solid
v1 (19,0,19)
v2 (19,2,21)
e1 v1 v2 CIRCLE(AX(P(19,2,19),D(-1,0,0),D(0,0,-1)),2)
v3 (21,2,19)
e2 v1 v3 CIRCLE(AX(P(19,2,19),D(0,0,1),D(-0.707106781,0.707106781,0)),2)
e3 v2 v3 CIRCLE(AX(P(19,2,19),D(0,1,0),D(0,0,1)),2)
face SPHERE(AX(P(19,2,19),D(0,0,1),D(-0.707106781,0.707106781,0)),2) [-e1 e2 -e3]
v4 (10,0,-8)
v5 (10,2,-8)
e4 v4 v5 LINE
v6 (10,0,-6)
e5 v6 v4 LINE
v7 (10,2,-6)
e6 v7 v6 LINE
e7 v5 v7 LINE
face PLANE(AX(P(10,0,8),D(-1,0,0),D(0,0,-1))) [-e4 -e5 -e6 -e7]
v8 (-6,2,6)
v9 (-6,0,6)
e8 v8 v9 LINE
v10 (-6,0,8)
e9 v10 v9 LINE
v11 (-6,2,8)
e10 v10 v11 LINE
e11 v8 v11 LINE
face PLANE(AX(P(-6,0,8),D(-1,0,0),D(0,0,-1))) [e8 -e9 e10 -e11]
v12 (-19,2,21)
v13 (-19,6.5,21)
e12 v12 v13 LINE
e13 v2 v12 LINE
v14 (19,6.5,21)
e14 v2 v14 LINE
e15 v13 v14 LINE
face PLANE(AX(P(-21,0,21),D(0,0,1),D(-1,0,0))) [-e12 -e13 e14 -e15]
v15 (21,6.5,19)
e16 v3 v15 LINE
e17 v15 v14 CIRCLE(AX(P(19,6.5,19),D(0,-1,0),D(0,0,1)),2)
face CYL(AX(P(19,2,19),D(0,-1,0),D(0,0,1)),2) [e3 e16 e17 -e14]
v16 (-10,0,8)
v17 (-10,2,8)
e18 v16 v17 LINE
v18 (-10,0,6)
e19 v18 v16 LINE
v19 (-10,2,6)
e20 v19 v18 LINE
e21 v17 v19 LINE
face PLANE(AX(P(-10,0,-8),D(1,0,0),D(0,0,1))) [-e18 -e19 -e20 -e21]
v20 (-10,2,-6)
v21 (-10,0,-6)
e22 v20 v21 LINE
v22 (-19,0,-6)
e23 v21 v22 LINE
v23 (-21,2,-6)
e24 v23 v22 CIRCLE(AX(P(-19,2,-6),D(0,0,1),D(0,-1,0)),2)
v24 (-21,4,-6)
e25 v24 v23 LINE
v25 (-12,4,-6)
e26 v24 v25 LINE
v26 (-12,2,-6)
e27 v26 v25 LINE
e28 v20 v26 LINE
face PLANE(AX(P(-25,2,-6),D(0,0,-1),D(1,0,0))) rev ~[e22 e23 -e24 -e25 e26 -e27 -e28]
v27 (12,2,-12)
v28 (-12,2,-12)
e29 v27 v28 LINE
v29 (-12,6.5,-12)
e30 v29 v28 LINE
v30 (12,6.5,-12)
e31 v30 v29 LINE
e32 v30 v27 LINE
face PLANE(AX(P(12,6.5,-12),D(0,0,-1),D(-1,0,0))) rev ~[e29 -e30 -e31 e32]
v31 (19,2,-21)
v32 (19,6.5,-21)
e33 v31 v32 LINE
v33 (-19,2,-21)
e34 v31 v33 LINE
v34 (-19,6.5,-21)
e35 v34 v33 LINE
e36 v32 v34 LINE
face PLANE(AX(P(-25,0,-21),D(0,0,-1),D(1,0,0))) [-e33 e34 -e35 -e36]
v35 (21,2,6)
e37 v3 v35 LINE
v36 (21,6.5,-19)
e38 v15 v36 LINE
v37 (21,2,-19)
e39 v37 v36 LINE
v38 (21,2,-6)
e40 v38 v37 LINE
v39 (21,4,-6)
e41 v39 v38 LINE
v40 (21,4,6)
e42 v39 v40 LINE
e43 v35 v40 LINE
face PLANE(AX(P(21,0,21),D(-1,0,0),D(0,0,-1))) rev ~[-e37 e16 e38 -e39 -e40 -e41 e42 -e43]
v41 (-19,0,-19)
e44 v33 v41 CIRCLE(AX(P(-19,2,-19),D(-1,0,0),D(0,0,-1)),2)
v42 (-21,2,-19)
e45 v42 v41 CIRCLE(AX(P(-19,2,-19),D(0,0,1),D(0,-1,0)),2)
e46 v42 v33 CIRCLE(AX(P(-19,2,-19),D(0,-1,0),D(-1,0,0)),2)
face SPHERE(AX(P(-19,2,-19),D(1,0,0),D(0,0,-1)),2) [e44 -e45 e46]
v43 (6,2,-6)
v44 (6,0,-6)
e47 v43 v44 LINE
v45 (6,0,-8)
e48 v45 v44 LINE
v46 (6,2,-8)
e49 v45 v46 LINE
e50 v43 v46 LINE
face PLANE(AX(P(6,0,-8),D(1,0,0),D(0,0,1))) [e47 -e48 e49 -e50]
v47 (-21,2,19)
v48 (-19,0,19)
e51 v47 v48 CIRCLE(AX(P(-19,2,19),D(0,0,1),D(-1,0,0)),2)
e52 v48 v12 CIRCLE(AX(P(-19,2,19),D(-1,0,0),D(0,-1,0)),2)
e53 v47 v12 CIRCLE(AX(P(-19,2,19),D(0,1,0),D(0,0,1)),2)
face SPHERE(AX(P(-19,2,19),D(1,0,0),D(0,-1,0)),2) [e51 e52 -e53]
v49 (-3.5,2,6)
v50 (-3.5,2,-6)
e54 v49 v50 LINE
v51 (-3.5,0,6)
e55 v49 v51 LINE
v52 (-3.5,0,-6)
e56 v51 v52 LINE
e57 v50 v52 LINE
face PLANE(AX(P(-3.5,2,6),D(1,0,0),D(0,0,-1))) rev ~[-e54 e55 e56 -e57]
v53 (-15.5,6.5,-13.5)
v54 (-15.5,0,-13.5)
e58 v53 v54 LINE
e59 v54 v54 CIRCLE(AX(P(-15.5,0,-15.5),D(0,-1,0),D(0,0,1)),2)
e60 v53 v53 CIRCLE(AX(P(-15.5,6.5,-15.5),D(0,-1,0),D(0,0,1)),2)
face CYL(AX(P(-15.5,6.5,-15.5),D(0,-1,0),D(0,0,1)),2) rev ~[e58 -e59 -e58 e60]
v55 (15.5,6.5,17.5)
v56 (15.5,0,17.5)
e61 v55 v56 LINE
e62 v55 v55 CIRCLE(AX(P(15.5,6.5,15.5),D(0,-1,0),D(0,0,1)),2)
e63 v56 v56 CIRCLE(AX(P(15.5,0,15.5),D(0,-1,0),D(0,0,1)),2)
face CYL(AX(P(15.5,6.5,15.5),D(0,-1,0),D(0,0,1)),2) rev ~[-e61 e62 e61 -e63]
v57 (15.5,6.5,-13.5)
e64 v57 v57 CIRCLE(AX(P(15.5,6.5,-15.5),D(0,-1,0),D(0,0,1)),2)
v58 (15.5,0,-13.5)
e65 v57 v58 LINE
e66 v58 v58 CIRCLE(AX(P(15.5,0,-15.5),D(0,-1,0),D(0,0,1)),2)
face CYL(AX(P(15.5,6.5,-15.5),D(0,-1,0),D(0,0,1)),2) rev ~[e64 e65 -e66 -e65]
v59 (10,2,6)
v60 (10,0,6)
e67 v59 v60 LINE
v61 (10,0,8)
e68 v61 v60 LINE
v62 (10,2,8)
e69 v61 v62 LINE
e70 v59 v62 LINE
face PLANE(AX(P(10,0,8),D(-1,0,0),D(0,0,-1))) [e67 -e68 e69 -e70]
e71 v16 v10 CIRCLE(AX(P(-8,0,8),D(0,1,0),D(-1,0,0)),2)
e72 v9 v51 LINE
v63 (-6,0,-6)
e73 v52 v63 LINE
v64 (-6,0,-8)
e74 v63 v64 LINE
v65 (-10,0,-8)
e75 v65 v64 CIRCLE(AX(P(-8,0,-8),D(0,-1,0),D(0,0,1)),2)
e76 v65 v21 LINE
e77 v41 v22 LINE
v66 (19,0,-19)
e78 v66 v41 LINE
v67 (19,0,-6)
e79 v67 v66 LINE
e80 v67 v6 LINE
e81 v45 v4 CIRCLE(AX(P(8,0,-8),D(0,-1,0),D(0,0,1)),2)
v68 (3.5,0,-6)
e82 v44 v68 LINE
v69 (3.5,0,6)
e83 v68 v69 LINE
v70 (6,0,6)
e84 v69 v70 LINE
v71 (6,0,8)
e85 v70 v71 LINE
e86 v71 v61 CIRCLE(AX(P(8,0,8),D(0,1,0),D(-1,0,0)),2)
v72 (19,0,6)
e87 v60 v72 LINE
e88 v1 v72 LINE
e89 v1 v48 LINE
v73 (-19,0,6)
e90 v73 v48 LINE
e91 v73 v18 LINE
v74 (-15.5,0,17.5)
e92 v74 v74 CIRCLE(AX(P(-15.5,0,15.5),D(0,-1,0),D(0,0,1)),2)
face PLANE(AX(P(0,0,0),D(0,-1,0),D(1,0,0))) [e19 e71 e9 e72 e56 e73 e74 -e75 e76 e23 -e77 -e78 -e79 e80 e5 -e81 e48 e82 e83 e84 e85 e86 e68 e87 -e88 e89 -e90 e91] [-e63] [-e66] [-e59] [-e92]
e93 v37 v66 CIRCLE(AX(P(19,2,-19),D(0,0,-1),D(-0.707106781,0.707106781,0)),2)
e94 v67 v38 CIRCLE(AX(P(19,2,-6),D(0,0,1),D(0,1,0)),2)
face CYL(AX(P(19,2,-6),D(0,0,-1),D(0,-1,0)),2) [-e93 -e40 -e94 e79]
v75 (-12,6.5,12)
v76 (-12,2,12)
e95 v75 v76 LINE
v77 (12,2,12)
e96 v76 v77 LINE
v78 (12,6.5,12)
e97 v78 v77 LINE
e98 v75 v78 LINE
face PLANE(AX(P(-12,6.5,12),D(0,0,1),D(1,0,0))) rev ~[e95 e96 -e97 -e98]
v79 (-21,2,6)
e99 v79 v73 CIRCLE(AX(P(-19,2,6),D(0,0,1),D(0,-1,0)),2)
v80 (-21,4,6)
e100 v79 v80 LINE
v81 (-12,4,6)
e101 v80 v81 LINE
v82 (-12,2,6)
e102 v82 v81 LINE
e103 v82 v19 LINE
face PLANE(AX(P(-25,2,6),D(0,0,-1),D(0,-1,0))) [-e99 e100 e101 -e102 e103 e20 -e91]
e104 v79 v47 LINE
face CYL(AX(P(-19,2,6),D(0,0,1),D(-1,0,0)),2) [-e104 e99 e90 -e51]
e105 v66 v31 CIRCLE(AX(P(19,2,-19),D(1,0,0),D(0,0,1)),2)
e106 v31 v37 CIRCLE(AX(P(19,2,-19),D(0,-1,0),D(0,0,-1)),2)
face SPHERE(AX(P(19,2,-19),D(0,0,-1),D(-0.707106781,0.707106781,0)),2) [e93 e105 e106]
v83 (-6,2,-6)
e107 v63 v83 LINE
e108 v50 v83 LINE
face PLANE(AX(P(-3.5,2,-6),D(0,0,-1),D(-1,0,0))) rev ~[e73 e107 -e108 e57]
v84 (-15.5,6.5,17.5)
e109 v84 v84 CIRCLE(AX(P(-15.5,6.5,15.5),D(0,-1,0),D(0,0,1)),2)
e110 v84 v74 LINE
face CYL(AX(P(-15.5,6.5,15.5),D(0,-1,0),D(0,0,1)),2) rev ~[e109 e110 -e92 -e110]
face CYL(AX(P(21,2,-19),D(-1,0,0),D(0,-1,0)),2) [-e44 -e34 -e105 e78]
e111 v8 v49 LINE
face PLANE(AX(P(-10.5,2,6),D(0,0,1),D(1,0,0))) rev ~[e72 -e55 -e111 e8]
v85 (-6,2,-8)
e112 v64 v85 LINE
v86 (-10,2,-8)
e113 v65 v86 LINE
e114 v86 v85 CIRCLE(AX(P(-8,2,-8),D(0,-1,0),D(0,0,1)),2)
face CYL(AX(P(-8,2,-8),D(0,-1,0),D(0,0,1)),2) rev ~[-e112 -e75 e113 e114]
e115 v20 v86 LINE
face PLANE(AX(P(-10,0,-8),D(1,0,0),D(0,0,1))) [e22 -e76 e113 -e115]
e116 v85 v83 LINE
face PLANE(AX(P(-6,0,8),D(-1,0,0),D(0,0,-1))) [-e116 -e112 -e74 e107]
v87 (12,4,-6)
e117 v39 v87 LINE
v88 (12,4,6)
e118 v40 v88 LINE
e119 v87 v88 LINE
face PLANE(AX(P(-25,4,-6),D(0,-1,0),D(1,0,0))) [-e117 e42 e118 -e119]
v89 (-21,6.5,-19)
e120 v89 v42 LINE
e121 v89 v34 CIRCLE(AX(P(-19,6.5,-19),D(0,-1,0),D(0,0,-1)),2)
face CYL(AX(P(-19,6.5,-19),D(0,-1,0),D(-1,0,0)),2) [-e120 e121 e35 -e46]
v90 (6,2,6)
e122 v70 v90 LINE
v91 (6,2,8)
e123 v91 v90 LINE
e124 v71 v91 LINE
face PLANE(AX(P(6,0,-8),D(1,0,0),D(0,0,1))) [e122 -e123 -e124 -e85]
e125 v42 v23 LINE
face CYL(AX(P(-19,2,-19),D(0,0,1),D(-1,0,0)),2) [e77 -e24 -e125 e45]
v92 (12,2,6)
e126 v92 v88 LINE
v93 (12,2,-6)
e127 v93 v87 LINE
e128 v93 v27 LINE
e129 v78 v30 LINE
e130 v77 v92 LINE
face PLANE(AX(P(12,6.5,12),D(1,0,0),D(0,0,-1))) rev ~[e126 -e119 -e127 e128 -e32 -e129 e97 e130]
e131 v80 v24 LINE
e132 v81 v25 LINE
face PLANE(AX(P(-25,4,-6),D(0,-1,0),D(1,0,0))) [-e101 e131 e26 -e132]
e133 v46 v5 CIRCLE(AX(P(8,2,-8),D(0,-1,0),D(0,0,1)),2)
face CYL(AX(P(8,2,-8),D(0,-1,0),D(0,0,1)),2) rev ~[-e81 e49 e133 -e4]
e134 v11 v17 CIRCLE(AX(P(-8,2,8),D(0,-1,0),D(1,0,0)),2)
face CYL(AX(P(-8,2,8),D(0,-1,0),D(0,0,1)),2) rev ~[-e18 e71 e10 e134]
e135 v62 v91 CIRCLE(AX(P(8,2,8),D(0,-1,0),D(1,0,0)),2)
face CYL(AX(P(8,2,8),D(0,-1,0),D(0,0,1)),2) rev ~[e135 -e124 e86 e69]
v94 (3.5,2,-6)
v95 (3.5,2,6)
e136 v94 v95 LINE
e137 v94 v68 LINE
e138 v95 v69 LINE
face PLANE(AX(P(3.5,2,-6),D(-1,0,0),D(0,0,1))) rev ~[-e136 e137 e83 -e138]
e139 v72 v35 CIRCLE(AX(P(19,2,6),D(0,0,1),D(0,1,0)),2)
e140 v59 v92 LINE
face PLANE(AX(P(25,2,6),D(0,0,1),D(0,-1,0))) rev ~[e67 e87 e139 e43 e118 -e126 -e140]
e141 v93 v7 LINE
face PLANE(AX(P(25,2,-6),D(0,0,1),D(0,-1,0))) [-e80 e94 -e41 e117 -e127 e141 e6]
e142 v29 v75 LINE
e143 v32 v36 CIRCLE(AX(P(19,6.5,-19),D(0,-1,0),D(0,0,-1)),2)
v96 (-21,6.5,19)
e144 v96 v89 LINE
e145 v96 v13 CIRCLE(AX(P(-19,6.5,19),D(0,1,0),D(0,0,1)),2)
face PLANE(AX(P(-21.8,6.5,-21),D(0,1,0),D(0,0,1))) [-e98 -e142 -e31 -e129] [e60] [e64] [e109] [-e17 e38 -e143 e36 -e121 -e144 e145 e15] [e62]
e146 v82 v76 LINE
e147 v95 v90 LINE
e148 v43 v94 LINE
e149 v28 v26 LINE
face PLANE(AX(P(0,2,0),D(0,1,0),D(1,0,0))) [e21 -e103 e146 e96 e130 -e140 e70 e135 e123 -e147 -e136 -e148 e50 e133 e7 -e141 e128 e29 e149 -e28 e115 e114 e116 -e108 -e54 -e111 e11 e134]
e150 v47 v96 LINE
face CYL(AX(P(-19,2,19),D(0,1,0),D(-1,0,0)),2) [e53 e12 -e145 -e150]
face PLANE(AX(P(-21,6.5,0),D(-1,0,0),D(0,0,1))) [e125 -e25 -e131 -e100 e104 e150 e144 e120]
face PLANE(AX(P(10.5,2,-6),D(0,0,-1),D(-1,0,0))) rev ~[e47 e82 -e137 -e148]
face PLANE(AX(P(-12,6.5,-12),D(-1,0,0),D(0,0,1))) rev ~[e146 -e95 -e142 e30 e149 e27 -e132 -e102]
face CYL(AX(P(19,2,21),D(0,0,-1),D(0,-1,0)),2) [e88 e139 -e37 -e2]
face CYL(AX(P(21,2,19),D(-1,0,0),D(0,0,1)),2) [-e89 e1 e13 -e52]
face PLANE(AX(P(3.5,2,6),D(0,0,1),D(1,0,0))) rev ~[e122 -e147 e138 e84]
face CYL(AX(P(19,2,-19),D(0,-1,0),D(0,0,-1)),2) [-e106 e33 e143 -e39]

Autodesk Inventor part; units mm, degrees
ref_plane "YZ Plane" through (0, 0, 0) normal (1, 0, 0) x (0, 1, 0)
ref_plane "XZ Plane" through (0, 0, 0) normal (0, 1, 0) x (-1, 0, 0)
sketch "Sketch1" plane through (0, 0, 0) normal (0, 1, 0) x (-1, 0, 0)
  line L0 (21, 21) -> (-21, 21)
  line L1 (-21, 21) -> (-21, -21)
  line L2 (-21, -21) -> (21, -21)
  line L3 (21, -21) -> (21, 21)
  line L4 (21, 21) -> (-21, -21) construction
  line L5 (-21, 21) -> (21, -21) construction
  point P0 (0, 0)
  dimension "d0" = 42
  dimension "d1" = 42
extrude "Extrusion1" add sketch "Sketch1" along normal blind 6.5
sketch "Sketch2" plane through (0, 6.5, 0) normal (0, 1, 0) x (1, 0, 0)
  line L0 (-12, -12) -> (12, -12)
  line L1 (12, -12) -> (12, 12)
  line L2 (12, 12) -> (-12, 12)
  line L3 (-12, 12) -> (-12, -12)
  line L4 (-12, -12) -> (12, 12) construction
  line L5 (12, -12) -> (-12, 12) construction
  point P0 (0, 0)
  dimension "d4" = 24
  dimension "d5" = 24
extrude "Extrusion2" cut sketch "Sketch2" against normal blind 4.5
sketch "Sketch3" plane through (0, 2, 0) normal (0, 1, 0) x (1, 0, 0)
  line L0 (-10.5, -6) -> (-3.5, -6)
  line L1 (-3.5, -6) -> (-3.5, 6)
  line L2 (-3.5, 6) -> (-10.5, 6)
  line L3 (-10.5, 6) -> (-10.5, -6)
  line L4 (-10.5, -6) -> (-3.5, 6) construction
  line L5 (-3.5, -6) -> (-10.5, 6) construction
  line L6 (-12, -12) -> (-12, 12) projected
  line L7 (3.5, -6) -> (10.5, -6)
  line L8 (10.5, -6) -> (10.5, 6)
  line L9 (10.5, 6) -> (3.5, 6)
  line L10 (3.5, 6) -> (3.5, -6)
  line L11 (3.5, -6) -> (10.5, 6) construction
  line L12 (10.5, -6) -> (3.5, 6) construction
  line L13 (12, 12) -> (12, -12) projected
  point P0 (0, 0)
  point P1 (-7, 0)
  point P2 (-7, 0)
  point P3 (7, 0)
  point P4 (7, 0)
  dimension "d8" = 7
  dimension "d9" = 12
  dimension "d10" = 1.5
  dimension "d11" = 7
  dimension "d12" = 1.5
  dimension "d13" = 12
extrude "Extrusion3" cut sketch "Sketch3" against normal blind 3.5
sketch "Sketch4" plane through (0, 2, 0) normal (0, 1, 0) x (1, 0, 0)
  line L0 (-12, -12) -> (-12, 12) projected
  line L1 (12, -12) -> (-12, -12) projected
  point P0 (0, 0)
  point P1 (-8, -8)
  point P2 (-8, 8)
  point P3 (8, 8)
  point P4 (8, -8)
  dimension "d16" = 16
  dimension "d17" = 16
  dimension "d18" = 4
  dimension "d19" = 4
hole "Hole1" at (-8, 2, 8) at (-8, 2, -8) at (8, 2, -8) at (8, 2, 8) direction (0, -1, 0) diameter 4 end through all
sketch "Sketch5" plane through (0, 6.5, 0) normal (0, 1, 0) x (1, 0, 0)
  line L0 (-21, -21) -> (21, -21) projected
  line L1 (-21, 21) -> (-21, -21) projected
  point P0 (0, 0)
  point P1 (-15.5, -15.5)
  point P2 (-15.5, 15.5)
  point P3 (15.5, 15.5)
  point P4 (15.5, -15.5)
  dimension "d27" = 31
  dimension "d28" = 31
  dimension "d29" = 5.5
  dimension "d30" = 5.5
hole "Hole2" at (-15.5, 6.5, 15.5) at (-15.5, 6.5, -15.5) at (15.5, 6.5, -15.5) at (15.5, 6.5, 15.5) direction (0, -1, 0) diameter 4 end through all
sketch "Sketch8" plane through (0, 0, 0) normal (0, -1, 0) x (1, 0, 0)
  line L0 (-21, -21) -> (-21, 21) projected
  line L1 (-21, 21) -> (-25, 21)
  line L2 (-25, 21) -> (-25, -21)
  line L3 (-25, -21) -> (-21, -21)
  line L4 (-21, -21) -> (-21, 21)
  line L5 (21, -21) -> (-21, -21) projected
  point P0 (0, 0)
  point P1 (25, -21)
  dimension "d48" = 4
extrude "Extrusion6" add sketch "Sketch8" against normal blind 46.5
sketch "Sketch9" plane through (-25, 0, -21) normal (-1, 0, 0) x (0, 0, 1)
  point P0 (21, 0)
ref_plane "Work Plane4" through (25, 0, 21) normal (1, 0, 0) x (0, 0, -1)
sketch "Sketch10" plane through (25, 0, 21) normal (1, 0, 0) x (0, 0, -1)
  line L0 (27, 2) -> (31, 2) projected
  line L1 (27, 2) -> (15, 2) projected
  line L2 (11, 2) -> (15, 2) projected
  line L3 (15, 2) -> (27, 2) projected
  line L4 (27, 2) -> (31, 2) projected
  line L5 (27, 2) -> (15, 2) projected
  line L6 (11, 2) -> (15, 2) projected
  line L7 (15, 2) -> (27, 2) projected
  line L8 (33, 2) -> (9, 2) projected
  line L9 (9, 2) -> (33, 2) projected
  line L10 (27, 2) -> (15, 2) projected
  line L11 (27, 2) -> (27, 0) projected
  line L12 (15, 2) -> (27, 2) projected
  line L13 (15, 2) -> (15, 0) projected
  line L14 (27, 0) -> (15, 0) projected
  point P0 (21, 0)
extrude "Extrusion7" cut sketch "Sketch10" against normal blind 15
sketch "Sketch11" plane through (-25, 0, -21) normal (-1, 0, 0) x (0, 0, 1)
  line L0 (27, 2) -> (27, 0) projected
  line L1 (15, 2) -> (27, 2) projected
  line L2 (15, 2) -> (15, 0) projected
  line L3 (27, 0) -> (15, 0) projected
  point P0 (21, 0)
extrude "Extrusion8" cut sketch "Sketch11" against normal blind 15
sketch "Sketch12" plane through (-25, 0, 6) normal (-1, 0, 0) x (0, 0, 1)
  line L0 (-27, 0) -> (-27, 46.5) projected
  point P0 (-6, 0)
  point P1 (-21, 41.5)
  point P2 (9, 41.5)
  point P3 (9, 11.5)
  point P4 (-21, 11.5)
  point P5 (-27, 5.5)
  dimension "d55" = 30
  dimension "d56" = 30
  dimension "d57" = 6
  dimension "d92" = 6
hole "Hole3" at (-25, 11.5, -15) at (-25, 11.5, 15) at (-25, 41.5, -15) at (-25, 41.5, 15) direction (1, 0, 0) diameter 3.5 depth 8 tip angle 118
sketch "Sketch13" plane through (-25, 0, 6) normal (-1, 0, 0) x (0, 0, 1)
  circle A0 centre (-21, 41.5) radius 1.75 projected
  circle A1 centre (-21, 11.5) radius 1.75 projected
  circle A2 centre (9, 11.5) radius 1.75 projected
  circle A3 centre (9, 41.5) radius 1.75 projected
  line L0 (0, 2) -> (0, 0) projected
  line L1 (15, 0) -> (0, 0) projected
  line L2 (15, 0) -> (15, 46.5) projected
  line L3 (-27, 46.5) -> (15, 46.5) projected
  line L4 (-27, 0) -> (-27, 46.5) projected
  line L5 (-12, 0) -> (-12, 2) projected
  line L6 (-12, 2) -> (0, 2) projected
  circle A4 centre (-21, 41.5) radius 3.25
  circle A5 centre (9, 41.5) radius 3.25
  circle A6 centre (9, 11.5) radius 3.25
  circle A7 centre (-21, 11.5) radius 3.25
  line L7 (-12, 0) -> (-27, 0) projected
  point P0 (-6, 0)
  dimension "d65" = 1.5
  dimension "d66" = 1.5
  dimension "d67" = 1.5
  dimension "d68" = 1.5
extrude "Extrusion9" add sketch "Sketch13" along normal blind 2 contours A4 | A5 | A6 | A7
fillet "Fillet2" radius 5 2 edges at (-23, 46.5, -21) (-23, 46.5, 21)
fillet "Fillet3" radius 1 4 edges at (-25, 11.5, 11.75) (-25, 41.5, 11.75) (-25, 41.5, -18.25) (-25, 11.5, -18.25)
sketch "Sketch16" plane through (-25, 2, -6) normal (0, -1, 0) x (1, 0, 0)
  line L0 (13, 12) -> (13, 0) projected
  line L1 (0, 12) -> (13, 12) projected
  line L2 (0, 0) -> (0, 12) projected
  line L3 (0, 0) -> (13, 0) projected
  line L4 (37, 0) -> (37, 12) projected
  line L5 (50, 0) -> (37, 0) projected
  line L6 (50, 12) -> (50, 0) projected
  line L7 (50, 12) -> (37, 12) projected
  point P0 (25, 6)
extrude "Extrusion11" cut sketch "Sketch16" against normal blind 2
sketch "Sketch17" plane through (-21, 6.5, 21) normal (1, 0, 0) x (0, 0, -1)
  arc A0 (5, 40) -> (0, 35) centre (5, 35) ccw projected
  line L0 (0, 0) -> (0, 35) projected
  line L1 (42, 0) -> (0, 0) projected
  line L2 (42, 0) -> (42, 35) projected
  arc A1 (42, 35) -> (37, 40) centre (37, 35) ccw projected
  line L3 (5, 40) -> (37, 40) projected
  circle A2 centre (36, 35) radius 1.75 projected
  circle A3 centre (36, 5) radius 1.75 projected
  circle A4 centre (6, 5) radius 1.75 projected
  circle A5 centre (6, 35) radius 1.75 projected
  point P0 (21, -6.5)
extrude "Extrusion12" cut sketch "Sketch17" against normal blind 0.8
sketch "Sketch19" plane through (-25, 0, 6) normal (-1, 0, 0) x (0, 0, 1)
  line L0 (6.5, 18.2831) -> (-6, 11.0662)
  line L1 (-6, 11.0662) -> (-18.5, 18.2831)
  line L2 (-18.5, 18.2831) -> (-18.5, 32.7169)
  line L3 (-18.5, 32.7169) -> (-6, 39.9338)
  line L4 (-6, 39.9338) -> (6.5, 32.7169)
  line L5 (6.5, 32.7169) -> (6.5, 18.2831)
  line L6 (-27, 0) -> (-27, 41.5) projected
  line L7 (-22, 46.5) -> (10, 46.5) projected
  point P0 (-6, 0)
  point P1 (-6, 25.5)
  dimension "d104" = 25
  dimension "d105" = 21
  dimension "d106" = 21
extrude "Extrusion14" cut sketch "Sketch19" against normal through all
fillet "Fillet4" radius 2 18 edges at (-23.4, 32.7169, -12.5) (-23.4, 39.9338, 0) (-23.4, 18.2831, -12.5) (-23.4, 11.0662, 0) (-23.4, 18.2831, 12.5) (-23.4, 32.7169, 12.5) (-25, 4, 0) (-25, 45.0355, 19.5355) (-25, 46.5, 0) (-25, 45.0355, -19.5355) (-25, 20.75, -21) (-25, 20.75, 21) (21, 0, -13.5) (21, 0, 13.5) (-25, 0, -13.5) (-25, 0, 13.5) (-2, 0, -21) (-2, 0, 21)
sketch "Sketch20" plane through (-21.8, 6.5, 21) normal (1, 0, 0) x (0, 0, -1)
  circle A0 centre (6, 35) radius 2.75
  circle A1 centre (6, 35) radius 1.75 projected
  point P0 (21, -6.5)
  dimension "d110" = 5.5
extrude "Extrusion15" cut sketch "Sketch20" against normal blind 3
pattern_linear "Rectangular Pattern2" count 2 spacing 30 along (0, 0, -1) count 2 spacing 30 along (0, -1, 0) of "Extrusion15"
sketch "Sketch21" plane through (0, 0, 0) normal (0, -1, 0) x (1, 0, 0)
  circle A0 centre (8, 8) radius 2 projected
  circle A1 centre (8, -8) radius 2 projected
  circle A2 centre (-8, -8) radius 2 projected
  circle A3 centre (-8, 8) radius 2 projected
  circle A4 centre (-8, 8) radius 2 projected
  line L0 (-10, 8) -> (-6, 8)
  line L1 (-6, 8) -> (-6, -8)
  line L2 (-6, -8) -> (-10, -8)
  line L3 (-10, -8) -> (-10, 8)
  line L4 (6, 8) -> (10, 8)
  line L5 (10, 8) -> (10, -8)
  line L6 (10, -8) -> (6, -8)
  line L7 (6, -8) -> (6, 8)
  point P0 (0, 0)
  point P1 (8, 6)
  point P2 (8, -6)
  point P3 (-8, -6)
  point P4 (-8, 6)
  point P5 (10, 8)
  point P6 (-6, 8)
extrude "Extrusion16" cut sketch "Sketch21" against normal blind 3 contours L5 A1 L7 A0 | A2 L3 A3 L1
sketch "Sketch22" plane through (-21.8, 6.5, 21) normal (1, 0, 0) x (0, 0, -1)
  circle A0 centre (36, 5) radius 2.75 projected
  circle A1 centre (6, 5) radius 2.75 projected
  circle A2 centre (36, 35) radius 2.75 projected
  circle A3 centre (6, 35) radius 2.75 projected
  line L0 (22, 32.8564) -> (32.5, 26.7942) projected
  arc A4 (33.5, 25.0622) -> (32.5, 26.7942) centre (31.5, 25.0622) ccw projected
  line L1 (33.5, 25.0622) -> (33.5, 12.9378) projected
  arc A5 (32.5, 11.2058) -> (33.5, 12.9378) centre (31.5, 12.9378) ccw projected
  line L2 (32.5, 11.2058) -> (22, 5.1436) projected
  arc A6 (20, 5.1436) -> (22, 5.1436) centre (21, 6.8756) ccw projected
  line L3 (20, 5.1436) -> (9.5, 11.2058) projected
  arc A7 (8.5, 12.9378) -> (9.5, 11.2058) centre (10.5, 12.9378) ccw projected
  line L4 (8.5, 12.9378) -> (8.5, 25.0622) projected
  arc A8 (9.5, 26.7942) -> (8.5, 25.0622) centre (10.5, 25.0622) ccw projected
  line L5 (9.5, 26.7942) -> (20, 32.8564) projected
  arc A9 (22, 32.8564) -> (20, 32.8564) centre (21, 31.1244) ccw projected
  arc A10 (42, 35) -> (37, 40) centre (37, 35) ccw projected
  line L6 (5, 40) -> (37, 40) projected
  arc A11 (5, 40) -> (0, 35) centre (5, 35) ccw projected
  line L7 (0, 0) -> (0, 35) projected
  line L8 (42, 0) -> (0, 0) projected
  line L9 (42, 35) -> (42, 0) projected
  circle A12 centre (36, 35) radius 1.75 projected
  circle A13 centre (36, 5) radius 1.75 projected
  circle A14 centre (6, 5) radius 1.75 projected
  circle A15 centre (6, 35) radius 1.75 projected
  point P0 (21, -6.5)
extrude "Extrusion17" cut sketch "Sketch22" against normal blind 10 contours A0 | A1 | A2 | A3 | L9 L8 L7 A11 L6 A10 | A12 | A13 | A14 | A15
fillet "Fillet5" radius 2 4 edges at (20.4142, 0.5858, 20.4142) (21, 4.25, 21) (20.4142, 0.5858, -20.4142) (21, 4.25, -21)
sketch "Sketch23" plane through (0, 6.5, 0) normal (0, 1, 0) x (1, 0, 0)
  circle A0 centre (15.5, 15.5) radius 2 projected
  circle A1 centre (-15.5, -15.5) radius 2 projected
  circle A2 centre (-15.5, 15.5) radius 2 projected
  circle A3 centre (15.5, -15.5) radius 2 projected
  line L0 (-12, 12) -> (12, 12) projected
  line L1 (12, 12) -> (12, -12) projected
  line L2 (12, -12) -> (-12, -12) projected
  line L3 (-12, -12) -> (-12, 12) projected
  arc A4 (21, 19) -> (19, 21) centre (19, 19) ccw projected
  line L4 (19, 21) -> (-23, 21) projected
  arc A5 (-23, 21) -> (-25, 19) centre (-23, 19) ccw projected
  line L5 (-25, -19) -> (-25, 19) projected
  arc A6 (-25, -19) -> (-23, -21) centre (-23, -19) ccw projected
  line L6 (19, -21) -> (-23, -21) projected
  arc A7 (19, -21) -> (21, -19) centre (19, -19) ccw projected
  line L7 (21, -19) -> (21, 19) projected
  line L8 (0, 0) -> (21, 0)
  line L9 (0, 0) -> (-21, 0)
  line L10 (-21, 0) -> (-21, 21)
  line L11 (-21, 0) -> (-21, -21)
  dimension "d124" = 21
  dimension "d125" = 21
extrude "Extrusion18" cut sketch "Sketch23" against normal blind 10 contours L11 L6 A6 L5 A5 L4 L10
fillet "Fillet6" radius 2 5 edges at (-21, 0.5858, -20.4142) (-21, 0, -12.5) (-21, 4.25, -21) (-21, 0.5858, 20.4142) (-21, 4.25, 21)
properties part number "Soporte base PCBs"
